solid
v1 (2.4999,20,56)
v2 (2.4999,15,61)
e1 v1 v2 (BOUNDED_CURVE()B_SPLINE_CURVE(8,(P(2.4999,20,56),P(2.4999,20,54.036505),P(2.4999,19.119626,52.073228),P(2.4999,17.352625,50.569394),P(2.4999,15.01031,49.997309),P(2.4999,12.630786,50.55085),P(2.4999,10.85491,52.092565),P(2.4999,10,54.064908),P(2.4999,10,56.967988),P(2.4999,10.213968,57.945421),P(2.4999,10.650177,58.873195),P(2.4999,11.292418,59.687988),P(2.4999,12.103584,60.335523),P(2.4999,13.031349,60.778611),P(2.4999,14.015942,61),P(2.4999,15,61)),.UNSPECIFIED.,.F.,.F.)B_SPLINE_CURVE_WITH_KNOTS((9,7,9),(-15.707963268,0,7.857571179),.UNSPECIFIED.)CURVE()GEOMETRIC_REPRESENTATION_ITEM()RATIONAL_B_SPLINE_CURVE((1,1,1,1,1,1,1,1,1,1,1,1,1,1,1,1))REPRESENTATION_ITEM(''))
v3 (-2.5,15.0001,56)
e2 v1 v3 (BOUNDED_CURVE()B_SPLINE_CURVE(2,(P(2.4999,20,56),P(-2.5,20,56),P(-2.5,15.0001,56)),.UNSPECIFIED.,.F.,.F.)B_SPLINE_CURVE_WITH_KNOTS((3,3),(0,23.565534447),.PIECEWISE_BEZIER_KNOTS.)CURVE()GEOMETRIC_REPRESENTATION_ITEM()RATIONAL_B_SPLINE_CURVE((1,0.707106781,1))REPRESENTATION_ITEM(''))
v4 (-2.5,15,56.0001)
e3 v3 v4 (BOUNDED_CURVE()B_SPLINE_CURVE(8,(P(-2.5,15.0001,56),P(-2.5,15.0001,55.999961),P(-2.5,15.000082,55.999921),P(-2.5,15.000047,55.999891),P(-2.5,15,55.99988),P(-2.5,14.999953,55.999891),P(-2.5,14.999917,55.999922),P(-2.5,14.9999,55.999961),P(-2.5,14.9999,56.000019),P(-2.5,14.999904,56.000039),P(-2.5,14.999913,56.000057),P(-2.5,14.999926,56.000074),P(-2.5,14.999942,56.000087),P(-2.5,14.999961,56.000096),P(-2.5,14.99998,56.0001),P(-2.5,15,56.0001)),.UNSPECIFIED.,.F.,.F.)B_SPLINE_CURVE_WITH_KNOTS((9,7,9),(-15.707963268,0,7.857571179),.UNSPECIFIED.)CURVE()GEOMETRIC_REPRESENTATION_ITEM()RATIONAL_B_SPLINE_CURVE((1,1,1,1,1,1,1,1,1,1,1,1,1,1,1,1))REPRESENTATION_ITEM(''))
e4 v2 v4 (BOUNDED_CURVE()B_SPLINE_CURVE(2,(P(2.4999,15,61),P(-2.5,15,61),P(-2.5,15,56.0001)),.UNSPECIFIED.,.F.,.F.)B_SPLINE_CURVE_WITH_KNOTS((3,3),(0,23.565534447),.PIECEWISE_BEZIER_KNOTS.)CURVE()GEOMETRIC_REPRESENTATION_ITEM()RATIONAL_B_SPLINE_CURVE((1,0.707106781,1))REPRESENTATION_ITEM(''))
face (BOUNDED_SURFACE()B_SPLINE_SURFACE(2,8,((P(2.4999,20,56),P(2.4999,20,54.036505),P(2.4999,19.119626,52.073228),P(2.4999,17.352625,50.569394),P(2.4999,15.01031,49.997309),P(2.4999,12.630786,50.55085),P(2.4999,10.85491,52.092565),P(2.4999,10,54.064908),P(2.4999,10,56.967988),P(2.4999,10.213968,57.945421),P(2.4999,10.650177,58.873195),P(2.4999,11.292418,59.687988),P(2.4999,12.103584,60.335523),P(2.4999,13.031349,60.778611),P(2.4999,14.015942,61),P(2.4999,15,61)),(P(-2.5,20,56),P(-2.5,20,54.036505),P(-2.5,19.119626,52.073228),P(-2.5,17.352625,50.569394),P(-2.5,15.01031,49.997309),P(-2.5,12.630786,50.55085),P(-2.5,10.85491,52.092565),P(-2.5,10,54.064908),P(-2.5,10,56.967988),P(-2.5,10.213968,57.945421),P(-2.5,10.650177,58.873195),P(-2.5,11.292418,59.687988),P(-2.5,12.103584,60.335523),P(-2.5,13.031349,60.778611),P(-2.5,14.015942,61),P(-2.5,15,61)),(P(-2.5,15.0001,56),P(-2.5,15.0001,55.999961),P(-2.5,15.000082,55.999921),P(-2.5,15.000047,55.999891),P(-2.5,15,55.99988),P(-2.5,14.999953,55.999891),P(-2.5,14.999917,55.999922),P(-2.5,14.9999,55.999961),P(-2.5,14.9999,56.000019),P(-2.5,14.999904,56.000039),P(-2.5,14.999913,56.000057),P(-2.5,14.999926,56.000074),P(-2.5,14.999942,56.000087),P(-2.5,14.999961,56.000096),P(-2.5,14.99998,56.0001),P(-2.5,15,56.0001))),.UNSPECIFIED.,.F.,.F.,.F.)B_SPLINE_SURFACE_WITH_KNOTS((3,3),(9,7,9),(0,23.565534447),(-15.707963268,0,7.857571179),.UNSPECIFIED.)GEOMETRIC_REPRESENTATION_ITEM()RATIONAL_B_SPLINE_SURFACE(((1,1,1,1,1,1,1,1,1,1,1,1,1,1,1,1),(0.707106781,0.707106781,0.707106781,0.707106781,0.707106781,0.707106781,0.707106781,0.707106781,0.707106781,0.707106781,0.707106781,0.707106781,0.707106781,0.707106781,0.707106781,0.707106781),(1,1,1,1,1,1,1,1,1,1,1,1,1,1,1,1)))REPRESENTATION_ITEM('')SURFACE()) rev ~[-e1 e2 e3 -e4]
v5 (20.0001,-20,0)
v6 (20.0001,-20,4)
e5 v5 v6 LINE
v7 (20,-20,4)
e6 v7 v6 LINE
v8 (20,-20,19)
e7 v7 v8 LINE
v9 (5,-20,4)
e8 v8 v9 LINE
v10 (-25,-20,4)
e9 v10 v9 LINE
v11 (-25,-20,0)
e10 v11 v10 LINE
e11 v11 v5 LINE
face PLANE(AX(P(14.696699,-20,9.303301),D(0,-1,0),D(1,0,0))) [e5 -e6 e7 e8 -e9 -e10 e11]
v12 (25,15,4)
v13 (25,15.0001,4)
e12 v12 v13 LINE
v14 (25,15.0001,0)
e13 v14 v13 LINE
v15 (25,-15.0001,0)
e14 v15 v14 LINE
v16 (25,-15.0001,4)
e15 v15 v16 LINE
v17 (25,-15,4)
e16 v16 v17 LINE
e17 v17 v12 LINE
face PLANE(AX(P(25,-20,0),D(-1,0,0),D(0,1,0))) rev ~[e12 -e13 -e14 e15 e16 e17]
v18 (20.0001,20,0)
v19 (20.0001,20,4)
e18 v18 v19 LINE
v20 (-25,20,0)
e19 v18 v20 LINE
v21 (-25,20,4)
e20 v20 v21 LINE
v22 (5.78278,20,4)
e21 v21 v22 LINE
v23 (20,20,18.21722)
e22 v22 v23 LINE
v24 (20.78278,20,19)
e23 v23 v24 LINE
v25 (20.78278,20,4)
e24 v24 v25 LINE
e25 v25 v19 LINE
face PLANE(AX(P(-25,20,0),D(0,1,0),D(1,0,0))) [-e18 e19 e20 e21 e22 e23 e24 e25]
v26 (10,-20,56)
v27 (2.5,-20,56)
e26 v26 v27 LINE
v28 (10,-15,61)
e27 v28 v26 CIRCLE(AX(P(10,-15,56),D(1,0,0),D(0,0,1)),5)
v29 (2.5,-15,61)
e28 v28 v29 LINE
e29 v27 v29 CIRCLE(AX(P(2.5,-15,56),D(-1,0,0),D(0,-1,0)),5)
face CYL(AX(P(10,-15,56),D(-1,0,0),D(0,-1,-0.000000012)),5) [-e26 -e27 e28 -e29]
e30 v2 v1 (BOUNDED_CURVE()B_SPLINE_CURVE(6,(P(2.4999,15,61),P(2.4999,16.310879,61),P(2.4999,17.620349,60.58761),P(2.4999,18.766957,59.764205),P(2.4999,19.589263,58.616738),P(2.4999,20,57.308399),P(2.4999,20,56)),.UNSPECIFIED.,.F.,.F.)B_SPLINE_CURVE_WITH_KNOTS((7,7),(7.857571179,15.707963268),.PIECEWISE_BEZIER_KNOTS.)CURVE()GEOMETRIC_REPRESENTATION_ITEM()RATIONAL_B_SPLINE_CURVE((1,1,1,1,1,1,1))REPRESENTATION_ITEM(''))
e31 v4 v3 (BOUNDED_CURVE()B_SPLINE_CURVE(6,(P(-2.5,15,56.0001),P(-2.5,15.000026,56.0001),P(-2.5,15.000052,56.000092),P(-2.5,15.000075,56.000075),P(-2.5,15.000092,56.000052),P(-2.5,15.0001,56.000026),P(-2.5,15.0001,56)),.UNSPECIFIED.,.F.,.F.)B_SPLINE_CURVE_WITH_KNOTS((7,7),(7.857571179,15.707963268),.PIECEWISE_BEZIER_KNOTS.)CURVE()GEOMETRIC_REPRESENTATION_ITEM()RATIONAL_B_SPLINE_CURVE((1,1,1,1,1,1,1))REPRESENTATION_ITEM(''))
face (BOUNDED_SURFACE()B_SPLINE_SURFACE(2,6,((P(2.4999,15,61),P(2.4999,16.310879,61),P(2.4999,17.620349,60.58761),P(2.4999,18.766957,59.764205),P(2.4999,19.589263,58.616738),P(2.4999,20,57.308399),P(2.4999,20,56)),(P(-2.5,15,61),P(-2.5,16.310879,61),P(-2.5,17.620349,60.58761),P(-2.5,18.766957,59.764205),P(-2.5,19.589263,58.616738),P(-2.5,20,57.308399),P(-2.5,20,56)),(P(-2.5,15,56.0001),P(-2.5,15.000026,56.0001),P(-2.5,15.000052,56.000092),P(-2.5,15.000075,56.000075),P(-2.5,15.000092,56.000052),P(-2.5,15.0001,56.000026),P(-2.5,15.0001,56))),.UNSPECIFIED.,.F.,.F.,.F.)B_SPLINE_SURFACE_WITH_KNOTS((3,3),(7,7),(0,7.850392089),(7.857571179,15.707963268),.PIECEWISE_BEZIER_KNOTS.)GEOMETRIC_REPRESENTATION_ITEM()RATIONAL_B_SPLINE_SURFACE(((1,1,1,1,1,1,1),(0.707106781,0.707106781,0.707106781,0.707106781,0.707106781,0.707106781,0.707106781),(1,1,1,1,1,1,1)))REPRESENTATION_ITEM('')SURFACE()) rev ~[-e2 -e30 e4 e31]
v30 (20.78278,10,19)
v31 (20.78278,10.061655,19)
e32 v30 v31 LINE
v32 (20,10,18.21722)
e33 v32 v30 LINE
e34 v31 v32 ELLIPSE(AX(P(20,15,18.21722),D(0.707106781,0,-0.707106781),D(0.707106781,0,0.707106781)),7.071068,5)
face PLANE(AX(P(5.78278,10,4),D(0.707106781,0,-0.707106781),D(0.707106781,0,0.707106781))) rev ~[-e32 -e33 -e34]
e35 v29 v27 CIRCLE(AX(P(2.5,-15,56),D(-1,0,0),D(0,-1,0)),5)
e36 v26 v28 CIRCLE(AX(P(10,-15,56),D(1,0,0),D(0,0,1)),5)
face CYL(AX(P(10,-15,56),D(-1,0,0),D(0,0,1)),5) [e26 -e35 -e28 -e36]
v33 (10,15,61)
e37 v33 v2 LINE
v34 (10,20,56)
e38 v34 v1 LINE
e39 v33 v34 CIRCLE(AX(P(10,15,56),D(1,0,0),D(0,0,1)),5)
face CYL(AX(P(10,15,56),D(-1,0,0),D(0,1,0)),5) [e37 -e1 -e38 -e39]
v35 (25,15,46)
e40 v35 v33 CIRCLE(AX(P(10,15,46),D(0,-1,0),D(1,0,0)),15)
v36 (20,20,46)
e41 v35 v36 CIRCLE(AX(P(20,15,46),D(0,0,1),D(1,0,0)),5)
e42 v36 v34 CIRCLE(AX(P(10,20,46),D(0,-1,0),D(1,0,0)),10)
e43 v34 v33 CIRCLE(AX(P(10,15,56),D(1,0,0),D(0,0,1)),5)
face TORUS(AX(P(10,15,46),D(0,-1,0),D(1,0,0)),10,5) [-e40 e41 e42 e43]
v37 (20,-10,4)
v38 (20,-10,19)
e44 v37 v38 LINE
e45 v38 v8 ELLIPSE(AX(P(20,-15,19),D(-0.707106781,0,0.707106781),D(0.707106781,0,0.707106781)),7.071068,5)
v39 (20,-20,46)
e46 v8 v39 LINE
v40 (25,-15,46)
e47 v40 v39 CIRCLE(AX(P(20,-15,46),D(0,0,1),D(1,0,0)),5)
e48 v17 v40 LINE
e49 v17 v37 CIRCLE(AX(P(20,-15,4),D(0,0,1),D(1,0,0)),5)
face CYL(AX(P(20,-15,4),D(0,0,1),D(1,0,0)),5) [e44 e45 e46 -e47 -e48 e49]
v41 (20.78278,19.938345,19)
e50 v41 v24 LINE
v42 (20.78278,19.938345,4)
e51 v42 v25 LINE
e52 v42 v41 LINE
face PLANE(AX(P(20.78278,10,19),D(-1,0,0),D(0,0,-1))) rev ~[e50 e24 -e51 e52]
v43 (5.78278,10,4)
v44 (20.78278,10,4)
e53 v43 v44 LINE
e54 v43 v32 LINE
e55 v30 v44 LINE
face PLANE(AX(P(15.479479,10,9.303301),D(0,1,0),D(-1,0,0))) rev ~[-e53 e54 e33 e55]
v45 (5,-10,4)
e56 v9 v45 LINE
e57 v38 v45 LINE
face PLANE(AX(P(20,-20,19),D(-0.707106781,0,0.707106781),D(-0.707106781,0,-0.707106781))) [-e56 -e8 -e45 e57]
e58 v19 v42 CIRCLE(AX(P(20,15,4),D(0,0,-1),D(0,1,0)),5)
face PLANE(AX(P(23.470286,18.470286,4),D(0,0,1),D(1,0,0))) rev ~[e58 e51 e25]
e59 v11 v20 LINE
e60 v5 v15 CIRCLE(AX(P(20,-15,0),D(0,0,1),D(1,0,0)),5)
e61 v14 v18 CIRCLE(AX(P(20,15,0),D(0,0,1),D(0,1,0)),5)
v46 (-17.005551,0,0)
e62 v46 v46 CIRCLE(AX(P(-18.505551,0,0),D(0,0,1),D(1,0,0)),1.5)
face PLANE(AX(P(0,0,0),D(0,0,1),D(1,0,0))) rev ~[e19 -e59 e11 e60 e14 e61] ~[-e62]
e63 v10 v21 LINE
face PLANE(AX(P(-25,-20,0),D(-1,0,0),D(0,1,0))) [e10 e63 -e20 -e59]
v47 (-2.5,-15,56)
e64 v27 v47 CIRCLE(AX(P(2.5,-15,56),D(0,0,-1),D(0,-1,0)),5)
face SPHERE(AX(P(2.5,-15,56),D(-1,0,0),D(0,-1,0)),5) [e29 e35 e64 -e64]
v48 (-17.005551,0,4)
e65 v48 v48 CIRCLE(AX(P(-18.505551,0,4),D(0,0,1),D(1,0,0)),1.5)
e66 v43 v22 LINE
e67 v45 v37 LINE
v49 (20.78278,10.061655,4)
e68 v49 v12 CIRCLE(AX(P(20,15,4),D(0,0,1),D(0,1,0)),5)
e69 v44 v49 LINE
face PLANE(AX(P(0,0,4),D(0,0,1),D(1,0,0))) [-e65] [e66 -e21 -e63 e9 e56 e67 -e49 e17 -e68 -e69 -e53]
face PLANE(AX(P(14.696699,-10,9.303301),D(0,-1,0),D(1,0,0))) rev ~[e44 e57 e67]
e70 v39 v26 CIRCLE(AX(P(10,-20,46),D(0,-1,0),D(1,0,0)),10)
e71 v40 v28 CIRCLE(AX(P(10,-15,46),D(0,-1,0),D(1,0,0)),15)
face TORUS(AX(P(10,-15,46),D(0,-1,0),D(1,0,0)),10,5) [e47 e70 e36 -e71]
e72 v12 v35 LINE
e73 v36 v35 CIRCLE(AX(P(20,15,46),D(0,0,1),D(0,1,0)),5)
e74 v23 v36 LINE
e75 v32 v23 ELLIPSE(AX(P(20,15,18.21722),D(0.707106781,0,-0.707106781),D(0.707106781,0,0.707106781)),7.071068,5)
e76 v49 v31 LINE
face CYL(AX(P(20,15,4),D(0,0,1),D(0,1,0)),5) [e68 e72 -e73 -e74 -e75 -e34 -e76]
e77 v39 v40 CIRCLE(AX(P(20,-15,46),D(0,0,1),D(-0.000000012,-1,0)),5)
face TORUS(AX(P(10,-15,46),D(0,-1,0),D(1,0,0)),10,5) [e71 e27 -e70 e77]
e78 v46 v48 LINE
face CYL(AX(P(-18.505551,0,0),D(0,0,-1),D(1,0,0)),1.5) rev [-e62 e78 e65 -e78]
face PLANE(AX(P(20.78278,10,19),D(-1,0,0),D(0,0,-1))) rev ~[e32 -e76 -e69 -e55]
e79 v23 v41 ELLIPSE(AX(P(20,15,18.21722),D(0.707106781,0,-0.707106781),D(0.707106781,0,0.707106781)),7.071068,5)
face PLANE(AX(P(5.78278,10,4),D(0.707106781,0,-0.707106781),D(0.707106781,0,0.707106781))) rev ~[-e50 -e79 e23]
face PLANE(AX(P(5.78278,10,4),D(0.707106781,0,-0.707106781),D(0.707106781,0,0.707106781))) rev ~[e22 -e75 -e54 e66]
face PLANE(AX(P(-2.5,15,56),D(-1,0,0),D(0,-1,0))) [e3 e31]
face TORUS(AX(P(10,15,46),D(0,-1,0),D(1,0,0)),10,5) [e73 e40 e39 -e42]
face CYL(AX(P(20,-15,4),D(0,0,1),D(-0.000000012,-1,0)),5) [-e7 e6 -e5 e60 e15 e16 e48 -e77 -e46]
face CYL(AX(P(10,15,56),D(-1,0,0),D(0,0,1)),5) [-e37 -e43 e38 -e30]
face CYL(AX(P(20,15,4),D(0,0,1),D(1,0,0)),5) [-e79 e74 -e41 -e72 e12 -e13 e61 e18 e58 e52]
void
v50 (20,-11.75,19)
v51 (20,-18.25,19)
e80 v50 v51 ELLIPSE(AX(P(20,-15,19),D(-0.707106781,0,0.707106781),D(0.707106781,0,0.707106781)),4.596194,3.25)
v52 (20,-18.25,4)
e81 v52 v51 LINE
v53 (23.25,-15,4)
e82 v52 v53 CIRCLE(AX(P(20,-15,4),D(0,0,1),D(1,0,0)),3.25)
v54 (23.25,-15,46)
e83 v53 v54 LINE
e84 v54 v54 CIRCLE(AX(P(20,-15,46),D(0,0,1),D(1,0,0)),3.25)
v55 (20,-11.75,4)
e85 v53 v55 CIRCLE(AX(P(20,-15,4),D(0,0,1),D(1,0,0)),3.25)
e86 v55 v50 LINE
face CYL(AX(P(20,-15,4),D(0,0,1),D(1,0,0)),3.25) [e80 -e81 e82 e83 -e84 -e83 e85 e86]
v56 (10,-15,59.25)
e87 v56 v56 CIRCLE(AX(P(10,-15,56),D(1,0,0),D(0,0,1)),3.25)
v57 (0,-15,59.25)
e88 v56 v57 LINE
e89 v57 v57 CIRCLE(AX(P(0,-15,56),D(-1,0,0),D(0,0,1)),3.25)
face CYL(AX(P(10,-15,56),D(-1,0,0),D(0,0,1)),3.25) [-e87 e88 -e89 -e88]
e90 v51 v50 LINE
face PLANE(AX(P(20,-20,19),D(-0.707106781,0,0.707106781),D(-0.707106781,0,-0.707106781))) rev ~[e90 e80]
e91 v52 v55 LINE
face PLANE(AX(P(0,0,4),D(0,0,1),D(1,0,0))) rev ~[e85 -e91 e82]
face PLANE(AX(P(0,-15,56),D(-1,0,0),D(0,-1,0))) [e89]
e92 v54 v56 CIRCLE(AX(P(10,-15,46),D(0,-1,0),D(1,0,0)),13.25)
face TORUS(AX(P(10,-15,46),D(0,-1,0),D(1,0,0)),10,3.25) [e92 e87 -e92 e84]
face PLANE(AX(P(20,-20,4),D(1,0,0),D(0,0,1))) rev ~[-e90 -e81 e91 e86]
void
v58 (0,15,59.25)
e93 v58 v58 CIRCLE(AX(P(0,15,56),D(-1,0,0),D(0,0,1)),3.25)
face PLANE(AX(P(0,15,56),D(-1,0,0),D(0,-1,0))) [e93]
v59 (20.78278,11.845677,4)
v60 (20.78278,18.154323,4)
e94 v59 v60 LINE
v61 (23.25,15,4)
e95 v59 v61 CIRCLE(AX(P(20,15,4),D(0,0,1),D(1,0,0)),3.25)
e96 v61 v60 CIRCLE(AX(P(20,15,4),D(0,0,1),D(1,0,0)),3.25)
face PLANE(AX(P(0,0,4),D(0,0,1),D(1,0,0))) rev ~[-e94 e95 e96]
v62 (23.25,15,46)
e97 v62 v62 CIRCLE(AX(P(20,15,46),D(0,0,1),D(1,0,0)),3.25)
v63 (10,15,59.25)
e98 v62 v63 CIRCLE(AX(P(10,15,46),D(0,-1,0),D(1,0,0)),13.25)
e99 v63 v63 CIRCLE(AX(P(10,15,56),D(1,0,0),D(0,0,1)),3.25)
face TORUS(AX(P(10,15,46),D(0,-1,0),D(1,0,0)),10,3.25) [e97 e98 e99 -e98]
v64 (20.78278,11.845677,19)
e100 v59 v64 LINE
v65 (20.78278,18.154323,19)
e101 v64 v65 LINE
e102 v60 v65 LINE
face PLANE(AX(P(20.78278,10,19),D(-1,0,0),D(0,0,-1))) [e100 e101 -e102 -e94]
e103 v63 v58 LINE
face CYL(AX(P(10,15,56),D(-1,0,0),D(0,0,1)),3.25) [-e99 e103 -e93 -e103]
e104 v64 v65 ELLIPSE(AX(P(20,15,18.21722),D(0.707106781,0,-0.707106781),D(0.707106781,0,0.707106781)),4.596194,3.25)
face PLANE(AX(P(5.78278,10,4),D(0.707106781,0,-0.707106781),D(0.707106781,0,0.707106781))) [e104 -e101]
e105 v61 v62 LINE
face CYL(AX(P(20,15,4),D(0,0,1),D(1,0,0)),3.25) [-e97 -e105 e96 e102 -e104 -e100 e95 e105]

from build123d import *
from build123d import SkipClean  # not in build123d's __all__

# Parameters (mm, degrees)
F0_W      = 50
F0_H      = 40
F0_R      = 1.5
F1_DEPTH  = 4
F2_R      = 3.25
F9_R      = 5
F10_DEPTH = 2.5
F12_R     = 5
F13_DEPTH = 2.5
F14_R     = 4.9999
F17_DEPTH = 10
F18_DEPTH = 25
F20_DEPTH = 10


# Not quite as in the source:
# - a fillet or chamfer that OpenCascade refuses, or shapes differently, is made with other operations: its cross-section is extruded or revolved along the edge and cut away or added
# - a fillet or chamfer is up to 0.001 mm smaller than in the source, because OpenCascade refuses the exact size


with BuildPart() as f1:
    # F0 (on Top) → F1 (new body)
    with BuildSketch(Plane.XY):
        Rectangle(F0_W, F0_H)
        with Locations((-18.505550921, 0)):
            Circle(F0_R, mode=Mode.SUBTRACT)
    extrude(amount=F1_DEPTH)

    # F5: sweep along a path in F4
    with BuildLine(Plane.XZ.offset(-15)) as f5_path:
        Line((20, 4), (20, 46))
        ThreePointArc((20, 46), (17.0710678119, 53.0710678119), (10, 56))
        Line((10, 56), (0, 56))
    # F2 (on face) → F5 (sweep)
    with BuildSketch(Plane.XY.offset(4)):
        with BuildLine():
            ThreePointArc((20, 20), (16.4644660941, 11.4644660941), (25, 15))
            ThreePointArc((25, 15), (23.5355339059, 18.5355339059), (20, 20))
        make_face()
        with Locations((20, 15)):
            Circle(F2_R, mode=Mode.SUBTRACT)
    sweep(path=f5_path.line)

    # F8: sweep along a path in F7
    with BuildLine(Plane.XZ.offset(15)) as f8_path:
        Line((20, 4), (20, 46))
        ThreePointArc((20, 46), (17.0710678119, 53.0710678119), (10, 56))
        Line((10, 56), (0, 56))
    # F2 (on face) → F8 (sweep)
    with BuildSketch(Plane.XY.offset(4)):
        with BuildLine():
            ThreePointArc((19.9999999389, -20), (23.5355338843, -18.5355339275), (25, -15))
            ThreePointArc((25, -15), (16.4644661157, -11.4644660725), (19.9999999389, -20))
        make_face()
        with Locations((20, -15)):
            Circle(F2_R, mode=Mode.SUBTRACT)
    sweep(path=f8_path.line)

    # F9 (on face) → F10 (join)
    with BuildSketch(Plane(origin=(0, 0, 0), x_dir=(0, -1, 0), z_dir=(-1, 0, 0))):
        with Locations((15, 56)):
            Circle(F9_R)
    extrude(amount=F10_DEPTH)

    # F11: fillet of radius 5 on 1 edges, made by hand

    # F11_s1 → F11_t2 (revolve, cut)
    with BuildSketch(Plane.XY.offset(56)):
        with BuildLine():
            ThreePointArc((2.5, -20), (-1.0355339059, -18.5355339059), (-2.5, -15))
            Line((-2.5, -15), (-2.5, -20))
            Line((-2.5, -20), (2.5, -20))
        make_face()
    revolve(axis=Axis((-2.5, -15, 56), (-1, 0, 0)), mode=Mode.SUBTRACT)

    # F12 (on face) → F13 (join)
    with BuildSketch(Plane(origin=(0, 0, 0), x_dir=(0, -1, 0), z_dir=(-1, 0, 0))):
        with Locations((-15, 56)):
            Circle(F12_R)
    extrude(amount=F13_DEPTH)

    # F14 (radius 5 in the source; OpenCascade refuses exactly that, so slightly less here)
    f14_edges = [f1.edges().sort_by_distance(p)[0] for p in [
        (-2.5, 20, 56),
        (25, 20, 2),
        (25, -20, 2),
    ]]
    fillet(f14_edges, radius=F14_R)

    # F16 (on offset) → F17 (join)
    with BuildSketch(Plane(origin=(0, 10, 0), x_dir=(-1, 0, 0), z_dir=(0, 1, 0))):
        Polygon((-20.7827799022, 4), (-5.7827799022, 4), (-20.7827799022, 19), align=None)
    with SkipClean():  # cleaning this boolean's faces spoils the solid; the shape is the same uncleaned
        extrude(amount=F17_DEPTH)

    # F2 (on face) → F18 (cut)
    with BuildSketch(Plane.XY.offset(4)):
        with BuildLine():
            Line((25, -20), (25, -15))
            ThreePointArc((25, -15), (23.5355338843, -18.5355339275), (19.9999999389, -20))
            Line((19.9999999389, -20), (25, -20))
        make_face()
        with BuildLine():
            ThreePointArc((20, 20), (23.5355339059, 18.5355339059), (25, 15))
            Line((25, 15), (25, 20))
            Line((25, 20), (20, 20))
        make_face()
    extrude(amount=-F18_DEPTH, mode=Mode.SUBTRACT)

    # F19 (on face) → F20 (join)
    with BuildSketch(Plane.XZ.offset(20)):
        Polygon((5, 4), (20, 4), (20, 19), align=None)
    extrude(amount=-F20_DEPTH)


solid = f1.part
